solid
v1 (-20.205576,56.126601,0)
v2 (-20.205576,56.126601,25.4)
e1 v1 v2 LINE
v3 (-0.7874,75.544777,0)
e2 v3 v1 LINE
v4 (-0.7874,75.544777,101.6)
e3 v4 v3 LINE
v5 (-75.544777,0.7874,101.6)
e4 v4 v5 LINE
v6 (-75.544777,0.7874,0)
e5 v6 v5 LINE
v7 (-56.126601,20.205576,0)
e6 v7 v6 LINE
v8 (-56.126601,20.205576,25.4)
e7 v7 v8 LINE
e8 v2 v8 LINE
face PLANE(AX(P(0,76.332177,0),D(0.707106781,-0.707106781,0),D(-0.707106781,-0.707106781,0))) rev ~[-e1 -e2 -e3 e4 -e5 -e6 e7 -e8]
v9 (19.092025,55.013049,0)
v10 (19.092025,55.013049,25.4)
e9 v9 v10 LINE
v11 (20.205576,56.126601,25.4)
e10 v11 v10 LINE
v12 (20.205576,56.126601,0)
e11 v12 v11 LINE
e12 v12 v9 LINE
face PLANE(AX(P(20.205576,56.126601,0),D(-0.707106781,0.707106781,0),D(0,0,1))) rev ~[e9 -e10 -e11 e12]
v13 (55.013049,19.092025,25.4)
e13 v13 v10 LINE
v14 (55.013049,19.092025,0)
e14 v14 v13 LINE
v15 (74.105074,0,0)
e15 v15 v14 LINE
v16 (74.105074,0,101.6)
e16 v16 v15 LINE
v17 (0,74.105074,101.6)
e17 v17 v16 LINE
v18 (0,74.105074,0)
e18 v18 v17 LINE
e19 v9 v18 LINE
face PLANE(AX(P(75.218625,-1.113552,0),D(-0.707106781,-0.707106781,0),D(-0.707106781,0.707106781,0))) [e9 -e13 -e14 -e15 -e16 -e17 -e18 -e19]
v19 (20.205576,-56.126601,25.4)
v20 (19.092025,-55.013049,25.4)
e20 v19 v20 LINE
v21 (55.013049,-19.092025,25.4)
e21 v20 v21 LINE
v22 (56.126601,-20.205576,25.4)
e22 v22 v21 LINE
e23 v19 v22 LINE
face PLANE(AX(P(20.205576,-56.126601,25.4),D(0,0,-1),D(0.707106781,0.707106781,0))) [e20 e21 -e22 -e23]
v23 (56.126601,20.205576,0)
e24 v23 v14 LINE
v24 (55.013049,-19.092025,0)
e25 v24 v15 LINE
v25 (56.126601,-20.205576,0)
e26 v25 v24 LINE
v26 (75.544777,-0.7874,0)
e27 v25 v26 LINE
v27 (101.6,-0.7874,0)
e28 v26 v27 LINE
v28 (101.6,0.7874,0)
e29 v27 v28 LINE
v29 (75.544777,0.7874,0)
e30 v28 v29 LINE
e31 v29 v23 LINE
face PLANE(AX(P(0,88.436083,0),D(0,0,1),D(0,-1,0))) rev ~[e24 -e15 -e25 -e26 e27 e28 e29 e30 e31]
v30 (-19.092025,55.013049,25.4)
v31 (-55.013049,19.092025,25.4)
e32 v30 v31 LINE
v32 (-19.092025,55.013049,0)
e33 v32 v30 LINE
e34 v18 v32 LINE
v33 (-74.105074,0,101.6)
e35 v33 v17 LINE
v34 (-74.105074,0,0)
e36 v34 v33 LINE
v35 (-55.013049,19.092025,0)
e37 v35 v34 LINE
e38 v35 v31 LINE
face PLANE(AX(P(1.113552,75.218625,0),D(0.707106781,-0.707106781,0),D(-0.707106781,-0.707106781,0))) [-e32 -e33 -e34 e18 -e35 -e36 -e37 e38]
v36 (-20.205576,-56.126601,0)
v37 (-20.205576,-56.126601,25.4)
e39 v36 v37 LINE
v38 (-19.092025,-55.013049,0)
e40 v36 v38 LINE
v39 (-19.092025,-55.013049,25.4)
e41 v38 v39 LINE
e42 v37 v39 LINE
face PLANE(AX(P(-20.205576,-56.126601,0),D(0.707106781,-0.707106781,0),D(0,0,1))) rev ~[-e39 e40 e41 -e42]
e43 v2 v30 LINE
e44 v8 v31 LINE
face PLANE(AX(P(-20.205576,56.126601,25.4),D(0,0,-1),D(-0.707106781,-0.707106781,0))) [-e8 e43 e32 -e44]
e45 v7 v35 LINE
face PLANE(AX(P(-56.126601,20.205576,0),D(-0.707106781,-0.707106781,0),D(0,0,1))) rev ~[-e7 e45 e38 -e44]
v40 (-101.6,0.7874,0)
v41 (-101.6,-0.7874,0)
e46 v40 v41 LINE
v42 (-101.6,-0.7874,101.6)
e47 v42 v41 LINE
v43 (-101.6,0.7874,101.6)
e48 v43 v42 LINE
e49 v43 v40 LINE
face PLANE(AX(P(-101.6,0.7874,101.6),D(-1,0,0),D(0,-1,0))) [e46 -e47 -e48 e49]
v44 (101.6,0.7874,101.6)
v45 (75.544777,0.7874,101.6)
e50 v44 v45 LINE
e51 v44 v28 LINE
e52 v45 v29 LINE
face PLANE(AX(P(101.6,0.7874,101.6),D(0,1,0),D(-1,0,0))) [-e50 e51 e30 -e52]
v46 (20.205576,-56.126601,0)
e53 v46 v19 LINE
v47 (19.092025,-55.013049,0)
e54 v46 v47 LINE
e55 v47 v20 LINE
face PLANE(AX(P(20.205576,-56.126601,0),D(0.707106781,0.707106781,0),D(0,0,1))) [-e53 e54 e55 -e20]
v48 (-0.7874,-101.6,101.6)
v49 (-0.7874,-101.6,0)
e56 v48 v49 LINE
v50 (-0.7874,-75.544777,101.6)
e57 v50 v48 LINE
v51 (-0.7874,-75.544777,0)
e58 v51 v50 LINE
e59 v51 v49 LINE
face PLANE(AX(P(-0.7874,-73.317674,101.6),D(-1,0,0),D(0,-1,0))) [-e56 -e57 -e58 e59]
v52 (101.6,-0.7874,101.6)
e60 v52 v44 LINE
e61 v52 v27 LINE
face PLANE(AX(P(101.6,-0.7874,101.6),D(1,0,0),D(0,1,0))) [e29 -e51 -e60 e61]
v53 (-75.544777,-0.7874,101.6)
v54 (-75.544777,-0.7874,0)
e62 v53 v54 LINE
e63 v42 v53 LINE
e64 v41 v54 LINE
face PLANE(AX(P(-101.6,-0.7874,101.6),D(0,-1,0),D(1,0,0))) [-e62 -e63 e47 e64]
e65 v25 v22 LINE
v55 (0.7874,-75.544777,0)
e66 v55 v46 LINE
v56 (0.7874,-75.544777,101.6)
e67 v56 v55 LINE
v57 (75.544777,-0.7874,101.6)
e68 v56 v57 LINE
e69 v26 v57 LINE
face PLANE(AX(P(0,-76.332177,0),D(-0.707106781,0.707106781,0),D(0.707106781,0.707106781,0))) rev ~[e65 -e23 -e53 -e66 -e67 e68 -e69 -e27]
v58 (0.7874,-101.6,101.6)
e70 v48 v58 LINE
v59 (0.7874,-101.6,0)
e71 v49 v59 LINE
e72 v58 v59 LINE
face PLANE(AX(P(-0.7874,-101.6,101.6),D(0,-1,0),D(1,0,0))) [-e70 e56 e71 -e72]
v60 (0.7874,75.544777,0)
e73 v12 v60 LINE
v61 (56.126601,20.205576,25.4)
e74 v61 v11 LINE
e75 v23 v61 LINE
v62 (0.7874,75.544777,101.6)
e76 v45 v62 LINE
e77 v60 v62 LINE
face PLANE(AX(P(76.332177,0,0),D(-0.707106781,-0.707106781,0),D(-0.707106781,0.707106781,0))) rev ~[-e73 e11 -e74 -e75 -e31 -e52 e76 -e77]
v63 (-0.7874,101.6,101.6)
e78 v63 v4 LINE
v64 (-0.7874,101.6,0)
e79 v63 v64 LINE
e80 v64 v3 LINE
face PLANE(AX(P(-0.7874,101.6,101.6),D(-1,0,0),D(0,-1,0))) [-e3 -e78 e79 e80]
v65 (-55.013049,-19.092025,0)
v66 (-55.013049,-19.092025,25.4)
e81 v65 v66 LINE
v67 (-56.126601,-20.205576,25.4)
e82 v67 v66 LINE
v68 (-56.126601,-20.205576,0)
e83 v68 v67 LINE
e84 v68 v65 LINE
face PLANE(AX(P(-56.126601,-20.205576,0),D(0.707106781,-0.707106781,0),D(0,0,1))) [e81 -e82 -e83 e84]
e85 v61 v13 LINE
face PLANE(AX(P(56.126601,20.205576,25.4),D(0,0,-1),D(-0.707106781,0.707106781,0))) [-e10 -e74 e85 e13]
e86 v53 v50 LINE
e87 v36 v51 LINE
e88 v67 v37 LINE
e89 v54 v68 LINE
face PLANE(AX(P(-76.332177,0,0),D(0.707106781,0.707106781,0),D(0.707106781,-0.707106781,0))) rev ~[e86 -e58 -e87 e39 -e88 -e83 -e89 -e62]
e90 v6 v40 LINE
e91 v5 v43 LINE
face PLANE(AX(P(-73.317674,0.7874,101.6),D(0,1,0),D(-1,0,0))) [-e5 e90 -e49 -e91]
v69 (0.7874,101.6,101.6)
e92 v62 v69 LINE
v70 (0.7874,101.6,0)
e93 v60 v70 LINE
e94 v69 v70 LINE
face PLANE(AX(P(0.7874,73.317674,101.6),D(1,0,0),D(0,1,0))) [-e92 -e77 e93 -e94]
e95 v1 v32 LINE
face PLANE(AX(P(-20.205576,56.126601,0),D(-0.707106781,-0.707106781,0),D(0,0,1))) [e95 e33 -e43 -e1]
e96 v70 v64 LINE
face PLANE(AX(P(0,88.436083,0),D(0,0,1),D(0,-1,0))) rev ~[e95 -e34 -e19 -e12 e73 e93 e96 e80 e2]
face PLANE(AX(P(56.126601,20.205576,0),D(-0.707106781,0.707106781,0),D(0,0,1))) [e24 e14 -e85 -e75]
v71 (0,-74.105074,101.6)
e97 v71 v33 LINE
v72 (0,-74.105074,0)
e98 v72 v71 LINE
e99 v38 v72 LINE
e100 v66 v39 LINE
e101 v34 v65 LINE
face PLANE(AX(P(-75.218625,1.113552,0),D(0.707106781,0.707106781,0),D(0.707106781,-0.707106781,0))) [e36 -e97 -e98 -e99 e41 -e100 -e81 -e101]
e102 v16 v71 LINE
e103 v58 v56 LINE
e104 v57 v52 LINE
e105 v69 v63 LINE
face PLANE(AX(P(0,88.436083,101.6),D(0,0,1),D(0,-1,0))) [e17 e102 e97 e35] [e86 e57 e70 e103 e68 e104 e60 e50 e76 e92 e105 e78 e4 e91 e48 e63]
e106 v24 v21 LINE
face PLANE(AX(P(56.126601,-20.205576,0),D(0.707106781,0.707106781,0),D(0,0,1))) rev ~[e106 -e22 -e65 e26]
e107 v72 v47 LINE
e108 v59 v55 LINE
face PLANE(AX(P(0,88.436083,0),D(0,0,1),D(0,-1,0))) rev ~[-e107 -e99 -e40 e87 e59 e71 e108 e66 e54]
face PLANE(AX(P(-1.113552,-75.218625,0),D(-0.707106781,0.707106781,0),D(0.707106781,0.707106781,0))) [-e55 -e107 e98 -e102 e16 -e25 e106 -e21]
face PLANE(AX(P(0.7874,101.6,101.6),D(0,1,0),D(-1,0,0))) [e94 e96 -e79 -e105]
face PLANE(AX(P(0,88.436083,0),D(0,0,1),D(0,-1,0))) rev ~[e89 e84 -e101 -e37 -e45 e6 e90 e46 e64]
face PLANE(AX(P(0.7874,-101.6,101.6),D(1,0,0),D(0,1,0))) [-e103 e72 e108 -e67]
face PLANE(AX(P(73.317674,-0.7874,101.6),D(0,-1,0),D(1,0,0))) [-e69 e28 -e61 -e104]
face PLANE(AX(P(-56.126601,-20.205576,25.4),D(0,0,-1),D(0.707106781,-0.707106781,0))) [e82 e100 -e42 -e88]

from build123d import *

# Parameters (mm, degrees)
F1_DEPTH        = 101.6
F2_T            = -1.5748
F4_DEPTH        = 101.6
F4_COPIES_COUNT = 4
F6_W            = 50.8
F6_H            = 25.4
F7_DEPTH        = 1.5748
F7_COPIES_COUNT = 4


# Not quite as in the source:
# - a pattern or mirror of a feature is missing from the dataset's text; its kind, count and spacing are read off the source's solid


with BuildPart() as f1:
    # F0 (on Top) → F1 (new body)
    with BuildSketch(Plane.XY):
        Polygon((76.3321770291, 0), (0, 76.3321770291), (-76.3321770291, 0), (0, -76.3321770291), align=None)
    extrude(amount=F1_DEPTH)

    # F2
    f2_openings = [f1.faces().sort_by_distance(p)[0] for p in [
        (0, 0, 101.6),
        (0, 0, 0),
    ]]
    offset(amount=F2_T, openings=f2_openings)

    # F3 (on face) → F4 (join, through all)
    with BuildSketch(Plane.XY.offset(101.6)):
        Polygon((-101.6, -0.7874), (-75.5447770291, -0.7874), (-76.3321770291, 0), (-75.5447770291, 0.7874), (-101.6, 0.7874), align=None)
        Polygon((-75.5447770291, -0.7874), (-73.3176735111, -0.7874), (-74.1050735111, 0), (-73.3176735111, 0.7874), (-75.5447770291, 0.7874), (-76.3321770291, 0), align=None)
    f4 = extrude(amount=-F4_DEPTH)

    # F4_copies: F4 ×4 about axis
    f4_copies_axis = Axis((0, 0, 0), (0, 0, 1))
    for i in range(1, F4_COPIES_COUNT):
        add(f4.rotate(f4_copies_axis, i * 360 / F4_COPIES_COUNT))

    # F6 (on face) → F7 (cut, through all)
    with BuildSketch(Plane(origin=(38.1660885145, -38.1660885145, 0), x_dir=(0.7071067812, 0.7071067812, 0), z_dir=(0.7071067812, -0.7071067812, 0))):
        with Locations((0, 12.7)):
            Rectangle(F6_W, F6_H)
    f7 = extrude(amount=-F7_DEPTH, mode=Mode.SUBTRACT)

    # F7_copies: F7 ×4 about axis
    f7_copies_axis = Axis((0, 0, 0), (0, 0, 1))
    for i in range(1, F7_COPIES_COUNT):
        add(f7.rotate(f7_copies_axis, i * 360 / F7_COPIES_COUNT), mode=Mode.SUBTRACT)


solid = f1.part
